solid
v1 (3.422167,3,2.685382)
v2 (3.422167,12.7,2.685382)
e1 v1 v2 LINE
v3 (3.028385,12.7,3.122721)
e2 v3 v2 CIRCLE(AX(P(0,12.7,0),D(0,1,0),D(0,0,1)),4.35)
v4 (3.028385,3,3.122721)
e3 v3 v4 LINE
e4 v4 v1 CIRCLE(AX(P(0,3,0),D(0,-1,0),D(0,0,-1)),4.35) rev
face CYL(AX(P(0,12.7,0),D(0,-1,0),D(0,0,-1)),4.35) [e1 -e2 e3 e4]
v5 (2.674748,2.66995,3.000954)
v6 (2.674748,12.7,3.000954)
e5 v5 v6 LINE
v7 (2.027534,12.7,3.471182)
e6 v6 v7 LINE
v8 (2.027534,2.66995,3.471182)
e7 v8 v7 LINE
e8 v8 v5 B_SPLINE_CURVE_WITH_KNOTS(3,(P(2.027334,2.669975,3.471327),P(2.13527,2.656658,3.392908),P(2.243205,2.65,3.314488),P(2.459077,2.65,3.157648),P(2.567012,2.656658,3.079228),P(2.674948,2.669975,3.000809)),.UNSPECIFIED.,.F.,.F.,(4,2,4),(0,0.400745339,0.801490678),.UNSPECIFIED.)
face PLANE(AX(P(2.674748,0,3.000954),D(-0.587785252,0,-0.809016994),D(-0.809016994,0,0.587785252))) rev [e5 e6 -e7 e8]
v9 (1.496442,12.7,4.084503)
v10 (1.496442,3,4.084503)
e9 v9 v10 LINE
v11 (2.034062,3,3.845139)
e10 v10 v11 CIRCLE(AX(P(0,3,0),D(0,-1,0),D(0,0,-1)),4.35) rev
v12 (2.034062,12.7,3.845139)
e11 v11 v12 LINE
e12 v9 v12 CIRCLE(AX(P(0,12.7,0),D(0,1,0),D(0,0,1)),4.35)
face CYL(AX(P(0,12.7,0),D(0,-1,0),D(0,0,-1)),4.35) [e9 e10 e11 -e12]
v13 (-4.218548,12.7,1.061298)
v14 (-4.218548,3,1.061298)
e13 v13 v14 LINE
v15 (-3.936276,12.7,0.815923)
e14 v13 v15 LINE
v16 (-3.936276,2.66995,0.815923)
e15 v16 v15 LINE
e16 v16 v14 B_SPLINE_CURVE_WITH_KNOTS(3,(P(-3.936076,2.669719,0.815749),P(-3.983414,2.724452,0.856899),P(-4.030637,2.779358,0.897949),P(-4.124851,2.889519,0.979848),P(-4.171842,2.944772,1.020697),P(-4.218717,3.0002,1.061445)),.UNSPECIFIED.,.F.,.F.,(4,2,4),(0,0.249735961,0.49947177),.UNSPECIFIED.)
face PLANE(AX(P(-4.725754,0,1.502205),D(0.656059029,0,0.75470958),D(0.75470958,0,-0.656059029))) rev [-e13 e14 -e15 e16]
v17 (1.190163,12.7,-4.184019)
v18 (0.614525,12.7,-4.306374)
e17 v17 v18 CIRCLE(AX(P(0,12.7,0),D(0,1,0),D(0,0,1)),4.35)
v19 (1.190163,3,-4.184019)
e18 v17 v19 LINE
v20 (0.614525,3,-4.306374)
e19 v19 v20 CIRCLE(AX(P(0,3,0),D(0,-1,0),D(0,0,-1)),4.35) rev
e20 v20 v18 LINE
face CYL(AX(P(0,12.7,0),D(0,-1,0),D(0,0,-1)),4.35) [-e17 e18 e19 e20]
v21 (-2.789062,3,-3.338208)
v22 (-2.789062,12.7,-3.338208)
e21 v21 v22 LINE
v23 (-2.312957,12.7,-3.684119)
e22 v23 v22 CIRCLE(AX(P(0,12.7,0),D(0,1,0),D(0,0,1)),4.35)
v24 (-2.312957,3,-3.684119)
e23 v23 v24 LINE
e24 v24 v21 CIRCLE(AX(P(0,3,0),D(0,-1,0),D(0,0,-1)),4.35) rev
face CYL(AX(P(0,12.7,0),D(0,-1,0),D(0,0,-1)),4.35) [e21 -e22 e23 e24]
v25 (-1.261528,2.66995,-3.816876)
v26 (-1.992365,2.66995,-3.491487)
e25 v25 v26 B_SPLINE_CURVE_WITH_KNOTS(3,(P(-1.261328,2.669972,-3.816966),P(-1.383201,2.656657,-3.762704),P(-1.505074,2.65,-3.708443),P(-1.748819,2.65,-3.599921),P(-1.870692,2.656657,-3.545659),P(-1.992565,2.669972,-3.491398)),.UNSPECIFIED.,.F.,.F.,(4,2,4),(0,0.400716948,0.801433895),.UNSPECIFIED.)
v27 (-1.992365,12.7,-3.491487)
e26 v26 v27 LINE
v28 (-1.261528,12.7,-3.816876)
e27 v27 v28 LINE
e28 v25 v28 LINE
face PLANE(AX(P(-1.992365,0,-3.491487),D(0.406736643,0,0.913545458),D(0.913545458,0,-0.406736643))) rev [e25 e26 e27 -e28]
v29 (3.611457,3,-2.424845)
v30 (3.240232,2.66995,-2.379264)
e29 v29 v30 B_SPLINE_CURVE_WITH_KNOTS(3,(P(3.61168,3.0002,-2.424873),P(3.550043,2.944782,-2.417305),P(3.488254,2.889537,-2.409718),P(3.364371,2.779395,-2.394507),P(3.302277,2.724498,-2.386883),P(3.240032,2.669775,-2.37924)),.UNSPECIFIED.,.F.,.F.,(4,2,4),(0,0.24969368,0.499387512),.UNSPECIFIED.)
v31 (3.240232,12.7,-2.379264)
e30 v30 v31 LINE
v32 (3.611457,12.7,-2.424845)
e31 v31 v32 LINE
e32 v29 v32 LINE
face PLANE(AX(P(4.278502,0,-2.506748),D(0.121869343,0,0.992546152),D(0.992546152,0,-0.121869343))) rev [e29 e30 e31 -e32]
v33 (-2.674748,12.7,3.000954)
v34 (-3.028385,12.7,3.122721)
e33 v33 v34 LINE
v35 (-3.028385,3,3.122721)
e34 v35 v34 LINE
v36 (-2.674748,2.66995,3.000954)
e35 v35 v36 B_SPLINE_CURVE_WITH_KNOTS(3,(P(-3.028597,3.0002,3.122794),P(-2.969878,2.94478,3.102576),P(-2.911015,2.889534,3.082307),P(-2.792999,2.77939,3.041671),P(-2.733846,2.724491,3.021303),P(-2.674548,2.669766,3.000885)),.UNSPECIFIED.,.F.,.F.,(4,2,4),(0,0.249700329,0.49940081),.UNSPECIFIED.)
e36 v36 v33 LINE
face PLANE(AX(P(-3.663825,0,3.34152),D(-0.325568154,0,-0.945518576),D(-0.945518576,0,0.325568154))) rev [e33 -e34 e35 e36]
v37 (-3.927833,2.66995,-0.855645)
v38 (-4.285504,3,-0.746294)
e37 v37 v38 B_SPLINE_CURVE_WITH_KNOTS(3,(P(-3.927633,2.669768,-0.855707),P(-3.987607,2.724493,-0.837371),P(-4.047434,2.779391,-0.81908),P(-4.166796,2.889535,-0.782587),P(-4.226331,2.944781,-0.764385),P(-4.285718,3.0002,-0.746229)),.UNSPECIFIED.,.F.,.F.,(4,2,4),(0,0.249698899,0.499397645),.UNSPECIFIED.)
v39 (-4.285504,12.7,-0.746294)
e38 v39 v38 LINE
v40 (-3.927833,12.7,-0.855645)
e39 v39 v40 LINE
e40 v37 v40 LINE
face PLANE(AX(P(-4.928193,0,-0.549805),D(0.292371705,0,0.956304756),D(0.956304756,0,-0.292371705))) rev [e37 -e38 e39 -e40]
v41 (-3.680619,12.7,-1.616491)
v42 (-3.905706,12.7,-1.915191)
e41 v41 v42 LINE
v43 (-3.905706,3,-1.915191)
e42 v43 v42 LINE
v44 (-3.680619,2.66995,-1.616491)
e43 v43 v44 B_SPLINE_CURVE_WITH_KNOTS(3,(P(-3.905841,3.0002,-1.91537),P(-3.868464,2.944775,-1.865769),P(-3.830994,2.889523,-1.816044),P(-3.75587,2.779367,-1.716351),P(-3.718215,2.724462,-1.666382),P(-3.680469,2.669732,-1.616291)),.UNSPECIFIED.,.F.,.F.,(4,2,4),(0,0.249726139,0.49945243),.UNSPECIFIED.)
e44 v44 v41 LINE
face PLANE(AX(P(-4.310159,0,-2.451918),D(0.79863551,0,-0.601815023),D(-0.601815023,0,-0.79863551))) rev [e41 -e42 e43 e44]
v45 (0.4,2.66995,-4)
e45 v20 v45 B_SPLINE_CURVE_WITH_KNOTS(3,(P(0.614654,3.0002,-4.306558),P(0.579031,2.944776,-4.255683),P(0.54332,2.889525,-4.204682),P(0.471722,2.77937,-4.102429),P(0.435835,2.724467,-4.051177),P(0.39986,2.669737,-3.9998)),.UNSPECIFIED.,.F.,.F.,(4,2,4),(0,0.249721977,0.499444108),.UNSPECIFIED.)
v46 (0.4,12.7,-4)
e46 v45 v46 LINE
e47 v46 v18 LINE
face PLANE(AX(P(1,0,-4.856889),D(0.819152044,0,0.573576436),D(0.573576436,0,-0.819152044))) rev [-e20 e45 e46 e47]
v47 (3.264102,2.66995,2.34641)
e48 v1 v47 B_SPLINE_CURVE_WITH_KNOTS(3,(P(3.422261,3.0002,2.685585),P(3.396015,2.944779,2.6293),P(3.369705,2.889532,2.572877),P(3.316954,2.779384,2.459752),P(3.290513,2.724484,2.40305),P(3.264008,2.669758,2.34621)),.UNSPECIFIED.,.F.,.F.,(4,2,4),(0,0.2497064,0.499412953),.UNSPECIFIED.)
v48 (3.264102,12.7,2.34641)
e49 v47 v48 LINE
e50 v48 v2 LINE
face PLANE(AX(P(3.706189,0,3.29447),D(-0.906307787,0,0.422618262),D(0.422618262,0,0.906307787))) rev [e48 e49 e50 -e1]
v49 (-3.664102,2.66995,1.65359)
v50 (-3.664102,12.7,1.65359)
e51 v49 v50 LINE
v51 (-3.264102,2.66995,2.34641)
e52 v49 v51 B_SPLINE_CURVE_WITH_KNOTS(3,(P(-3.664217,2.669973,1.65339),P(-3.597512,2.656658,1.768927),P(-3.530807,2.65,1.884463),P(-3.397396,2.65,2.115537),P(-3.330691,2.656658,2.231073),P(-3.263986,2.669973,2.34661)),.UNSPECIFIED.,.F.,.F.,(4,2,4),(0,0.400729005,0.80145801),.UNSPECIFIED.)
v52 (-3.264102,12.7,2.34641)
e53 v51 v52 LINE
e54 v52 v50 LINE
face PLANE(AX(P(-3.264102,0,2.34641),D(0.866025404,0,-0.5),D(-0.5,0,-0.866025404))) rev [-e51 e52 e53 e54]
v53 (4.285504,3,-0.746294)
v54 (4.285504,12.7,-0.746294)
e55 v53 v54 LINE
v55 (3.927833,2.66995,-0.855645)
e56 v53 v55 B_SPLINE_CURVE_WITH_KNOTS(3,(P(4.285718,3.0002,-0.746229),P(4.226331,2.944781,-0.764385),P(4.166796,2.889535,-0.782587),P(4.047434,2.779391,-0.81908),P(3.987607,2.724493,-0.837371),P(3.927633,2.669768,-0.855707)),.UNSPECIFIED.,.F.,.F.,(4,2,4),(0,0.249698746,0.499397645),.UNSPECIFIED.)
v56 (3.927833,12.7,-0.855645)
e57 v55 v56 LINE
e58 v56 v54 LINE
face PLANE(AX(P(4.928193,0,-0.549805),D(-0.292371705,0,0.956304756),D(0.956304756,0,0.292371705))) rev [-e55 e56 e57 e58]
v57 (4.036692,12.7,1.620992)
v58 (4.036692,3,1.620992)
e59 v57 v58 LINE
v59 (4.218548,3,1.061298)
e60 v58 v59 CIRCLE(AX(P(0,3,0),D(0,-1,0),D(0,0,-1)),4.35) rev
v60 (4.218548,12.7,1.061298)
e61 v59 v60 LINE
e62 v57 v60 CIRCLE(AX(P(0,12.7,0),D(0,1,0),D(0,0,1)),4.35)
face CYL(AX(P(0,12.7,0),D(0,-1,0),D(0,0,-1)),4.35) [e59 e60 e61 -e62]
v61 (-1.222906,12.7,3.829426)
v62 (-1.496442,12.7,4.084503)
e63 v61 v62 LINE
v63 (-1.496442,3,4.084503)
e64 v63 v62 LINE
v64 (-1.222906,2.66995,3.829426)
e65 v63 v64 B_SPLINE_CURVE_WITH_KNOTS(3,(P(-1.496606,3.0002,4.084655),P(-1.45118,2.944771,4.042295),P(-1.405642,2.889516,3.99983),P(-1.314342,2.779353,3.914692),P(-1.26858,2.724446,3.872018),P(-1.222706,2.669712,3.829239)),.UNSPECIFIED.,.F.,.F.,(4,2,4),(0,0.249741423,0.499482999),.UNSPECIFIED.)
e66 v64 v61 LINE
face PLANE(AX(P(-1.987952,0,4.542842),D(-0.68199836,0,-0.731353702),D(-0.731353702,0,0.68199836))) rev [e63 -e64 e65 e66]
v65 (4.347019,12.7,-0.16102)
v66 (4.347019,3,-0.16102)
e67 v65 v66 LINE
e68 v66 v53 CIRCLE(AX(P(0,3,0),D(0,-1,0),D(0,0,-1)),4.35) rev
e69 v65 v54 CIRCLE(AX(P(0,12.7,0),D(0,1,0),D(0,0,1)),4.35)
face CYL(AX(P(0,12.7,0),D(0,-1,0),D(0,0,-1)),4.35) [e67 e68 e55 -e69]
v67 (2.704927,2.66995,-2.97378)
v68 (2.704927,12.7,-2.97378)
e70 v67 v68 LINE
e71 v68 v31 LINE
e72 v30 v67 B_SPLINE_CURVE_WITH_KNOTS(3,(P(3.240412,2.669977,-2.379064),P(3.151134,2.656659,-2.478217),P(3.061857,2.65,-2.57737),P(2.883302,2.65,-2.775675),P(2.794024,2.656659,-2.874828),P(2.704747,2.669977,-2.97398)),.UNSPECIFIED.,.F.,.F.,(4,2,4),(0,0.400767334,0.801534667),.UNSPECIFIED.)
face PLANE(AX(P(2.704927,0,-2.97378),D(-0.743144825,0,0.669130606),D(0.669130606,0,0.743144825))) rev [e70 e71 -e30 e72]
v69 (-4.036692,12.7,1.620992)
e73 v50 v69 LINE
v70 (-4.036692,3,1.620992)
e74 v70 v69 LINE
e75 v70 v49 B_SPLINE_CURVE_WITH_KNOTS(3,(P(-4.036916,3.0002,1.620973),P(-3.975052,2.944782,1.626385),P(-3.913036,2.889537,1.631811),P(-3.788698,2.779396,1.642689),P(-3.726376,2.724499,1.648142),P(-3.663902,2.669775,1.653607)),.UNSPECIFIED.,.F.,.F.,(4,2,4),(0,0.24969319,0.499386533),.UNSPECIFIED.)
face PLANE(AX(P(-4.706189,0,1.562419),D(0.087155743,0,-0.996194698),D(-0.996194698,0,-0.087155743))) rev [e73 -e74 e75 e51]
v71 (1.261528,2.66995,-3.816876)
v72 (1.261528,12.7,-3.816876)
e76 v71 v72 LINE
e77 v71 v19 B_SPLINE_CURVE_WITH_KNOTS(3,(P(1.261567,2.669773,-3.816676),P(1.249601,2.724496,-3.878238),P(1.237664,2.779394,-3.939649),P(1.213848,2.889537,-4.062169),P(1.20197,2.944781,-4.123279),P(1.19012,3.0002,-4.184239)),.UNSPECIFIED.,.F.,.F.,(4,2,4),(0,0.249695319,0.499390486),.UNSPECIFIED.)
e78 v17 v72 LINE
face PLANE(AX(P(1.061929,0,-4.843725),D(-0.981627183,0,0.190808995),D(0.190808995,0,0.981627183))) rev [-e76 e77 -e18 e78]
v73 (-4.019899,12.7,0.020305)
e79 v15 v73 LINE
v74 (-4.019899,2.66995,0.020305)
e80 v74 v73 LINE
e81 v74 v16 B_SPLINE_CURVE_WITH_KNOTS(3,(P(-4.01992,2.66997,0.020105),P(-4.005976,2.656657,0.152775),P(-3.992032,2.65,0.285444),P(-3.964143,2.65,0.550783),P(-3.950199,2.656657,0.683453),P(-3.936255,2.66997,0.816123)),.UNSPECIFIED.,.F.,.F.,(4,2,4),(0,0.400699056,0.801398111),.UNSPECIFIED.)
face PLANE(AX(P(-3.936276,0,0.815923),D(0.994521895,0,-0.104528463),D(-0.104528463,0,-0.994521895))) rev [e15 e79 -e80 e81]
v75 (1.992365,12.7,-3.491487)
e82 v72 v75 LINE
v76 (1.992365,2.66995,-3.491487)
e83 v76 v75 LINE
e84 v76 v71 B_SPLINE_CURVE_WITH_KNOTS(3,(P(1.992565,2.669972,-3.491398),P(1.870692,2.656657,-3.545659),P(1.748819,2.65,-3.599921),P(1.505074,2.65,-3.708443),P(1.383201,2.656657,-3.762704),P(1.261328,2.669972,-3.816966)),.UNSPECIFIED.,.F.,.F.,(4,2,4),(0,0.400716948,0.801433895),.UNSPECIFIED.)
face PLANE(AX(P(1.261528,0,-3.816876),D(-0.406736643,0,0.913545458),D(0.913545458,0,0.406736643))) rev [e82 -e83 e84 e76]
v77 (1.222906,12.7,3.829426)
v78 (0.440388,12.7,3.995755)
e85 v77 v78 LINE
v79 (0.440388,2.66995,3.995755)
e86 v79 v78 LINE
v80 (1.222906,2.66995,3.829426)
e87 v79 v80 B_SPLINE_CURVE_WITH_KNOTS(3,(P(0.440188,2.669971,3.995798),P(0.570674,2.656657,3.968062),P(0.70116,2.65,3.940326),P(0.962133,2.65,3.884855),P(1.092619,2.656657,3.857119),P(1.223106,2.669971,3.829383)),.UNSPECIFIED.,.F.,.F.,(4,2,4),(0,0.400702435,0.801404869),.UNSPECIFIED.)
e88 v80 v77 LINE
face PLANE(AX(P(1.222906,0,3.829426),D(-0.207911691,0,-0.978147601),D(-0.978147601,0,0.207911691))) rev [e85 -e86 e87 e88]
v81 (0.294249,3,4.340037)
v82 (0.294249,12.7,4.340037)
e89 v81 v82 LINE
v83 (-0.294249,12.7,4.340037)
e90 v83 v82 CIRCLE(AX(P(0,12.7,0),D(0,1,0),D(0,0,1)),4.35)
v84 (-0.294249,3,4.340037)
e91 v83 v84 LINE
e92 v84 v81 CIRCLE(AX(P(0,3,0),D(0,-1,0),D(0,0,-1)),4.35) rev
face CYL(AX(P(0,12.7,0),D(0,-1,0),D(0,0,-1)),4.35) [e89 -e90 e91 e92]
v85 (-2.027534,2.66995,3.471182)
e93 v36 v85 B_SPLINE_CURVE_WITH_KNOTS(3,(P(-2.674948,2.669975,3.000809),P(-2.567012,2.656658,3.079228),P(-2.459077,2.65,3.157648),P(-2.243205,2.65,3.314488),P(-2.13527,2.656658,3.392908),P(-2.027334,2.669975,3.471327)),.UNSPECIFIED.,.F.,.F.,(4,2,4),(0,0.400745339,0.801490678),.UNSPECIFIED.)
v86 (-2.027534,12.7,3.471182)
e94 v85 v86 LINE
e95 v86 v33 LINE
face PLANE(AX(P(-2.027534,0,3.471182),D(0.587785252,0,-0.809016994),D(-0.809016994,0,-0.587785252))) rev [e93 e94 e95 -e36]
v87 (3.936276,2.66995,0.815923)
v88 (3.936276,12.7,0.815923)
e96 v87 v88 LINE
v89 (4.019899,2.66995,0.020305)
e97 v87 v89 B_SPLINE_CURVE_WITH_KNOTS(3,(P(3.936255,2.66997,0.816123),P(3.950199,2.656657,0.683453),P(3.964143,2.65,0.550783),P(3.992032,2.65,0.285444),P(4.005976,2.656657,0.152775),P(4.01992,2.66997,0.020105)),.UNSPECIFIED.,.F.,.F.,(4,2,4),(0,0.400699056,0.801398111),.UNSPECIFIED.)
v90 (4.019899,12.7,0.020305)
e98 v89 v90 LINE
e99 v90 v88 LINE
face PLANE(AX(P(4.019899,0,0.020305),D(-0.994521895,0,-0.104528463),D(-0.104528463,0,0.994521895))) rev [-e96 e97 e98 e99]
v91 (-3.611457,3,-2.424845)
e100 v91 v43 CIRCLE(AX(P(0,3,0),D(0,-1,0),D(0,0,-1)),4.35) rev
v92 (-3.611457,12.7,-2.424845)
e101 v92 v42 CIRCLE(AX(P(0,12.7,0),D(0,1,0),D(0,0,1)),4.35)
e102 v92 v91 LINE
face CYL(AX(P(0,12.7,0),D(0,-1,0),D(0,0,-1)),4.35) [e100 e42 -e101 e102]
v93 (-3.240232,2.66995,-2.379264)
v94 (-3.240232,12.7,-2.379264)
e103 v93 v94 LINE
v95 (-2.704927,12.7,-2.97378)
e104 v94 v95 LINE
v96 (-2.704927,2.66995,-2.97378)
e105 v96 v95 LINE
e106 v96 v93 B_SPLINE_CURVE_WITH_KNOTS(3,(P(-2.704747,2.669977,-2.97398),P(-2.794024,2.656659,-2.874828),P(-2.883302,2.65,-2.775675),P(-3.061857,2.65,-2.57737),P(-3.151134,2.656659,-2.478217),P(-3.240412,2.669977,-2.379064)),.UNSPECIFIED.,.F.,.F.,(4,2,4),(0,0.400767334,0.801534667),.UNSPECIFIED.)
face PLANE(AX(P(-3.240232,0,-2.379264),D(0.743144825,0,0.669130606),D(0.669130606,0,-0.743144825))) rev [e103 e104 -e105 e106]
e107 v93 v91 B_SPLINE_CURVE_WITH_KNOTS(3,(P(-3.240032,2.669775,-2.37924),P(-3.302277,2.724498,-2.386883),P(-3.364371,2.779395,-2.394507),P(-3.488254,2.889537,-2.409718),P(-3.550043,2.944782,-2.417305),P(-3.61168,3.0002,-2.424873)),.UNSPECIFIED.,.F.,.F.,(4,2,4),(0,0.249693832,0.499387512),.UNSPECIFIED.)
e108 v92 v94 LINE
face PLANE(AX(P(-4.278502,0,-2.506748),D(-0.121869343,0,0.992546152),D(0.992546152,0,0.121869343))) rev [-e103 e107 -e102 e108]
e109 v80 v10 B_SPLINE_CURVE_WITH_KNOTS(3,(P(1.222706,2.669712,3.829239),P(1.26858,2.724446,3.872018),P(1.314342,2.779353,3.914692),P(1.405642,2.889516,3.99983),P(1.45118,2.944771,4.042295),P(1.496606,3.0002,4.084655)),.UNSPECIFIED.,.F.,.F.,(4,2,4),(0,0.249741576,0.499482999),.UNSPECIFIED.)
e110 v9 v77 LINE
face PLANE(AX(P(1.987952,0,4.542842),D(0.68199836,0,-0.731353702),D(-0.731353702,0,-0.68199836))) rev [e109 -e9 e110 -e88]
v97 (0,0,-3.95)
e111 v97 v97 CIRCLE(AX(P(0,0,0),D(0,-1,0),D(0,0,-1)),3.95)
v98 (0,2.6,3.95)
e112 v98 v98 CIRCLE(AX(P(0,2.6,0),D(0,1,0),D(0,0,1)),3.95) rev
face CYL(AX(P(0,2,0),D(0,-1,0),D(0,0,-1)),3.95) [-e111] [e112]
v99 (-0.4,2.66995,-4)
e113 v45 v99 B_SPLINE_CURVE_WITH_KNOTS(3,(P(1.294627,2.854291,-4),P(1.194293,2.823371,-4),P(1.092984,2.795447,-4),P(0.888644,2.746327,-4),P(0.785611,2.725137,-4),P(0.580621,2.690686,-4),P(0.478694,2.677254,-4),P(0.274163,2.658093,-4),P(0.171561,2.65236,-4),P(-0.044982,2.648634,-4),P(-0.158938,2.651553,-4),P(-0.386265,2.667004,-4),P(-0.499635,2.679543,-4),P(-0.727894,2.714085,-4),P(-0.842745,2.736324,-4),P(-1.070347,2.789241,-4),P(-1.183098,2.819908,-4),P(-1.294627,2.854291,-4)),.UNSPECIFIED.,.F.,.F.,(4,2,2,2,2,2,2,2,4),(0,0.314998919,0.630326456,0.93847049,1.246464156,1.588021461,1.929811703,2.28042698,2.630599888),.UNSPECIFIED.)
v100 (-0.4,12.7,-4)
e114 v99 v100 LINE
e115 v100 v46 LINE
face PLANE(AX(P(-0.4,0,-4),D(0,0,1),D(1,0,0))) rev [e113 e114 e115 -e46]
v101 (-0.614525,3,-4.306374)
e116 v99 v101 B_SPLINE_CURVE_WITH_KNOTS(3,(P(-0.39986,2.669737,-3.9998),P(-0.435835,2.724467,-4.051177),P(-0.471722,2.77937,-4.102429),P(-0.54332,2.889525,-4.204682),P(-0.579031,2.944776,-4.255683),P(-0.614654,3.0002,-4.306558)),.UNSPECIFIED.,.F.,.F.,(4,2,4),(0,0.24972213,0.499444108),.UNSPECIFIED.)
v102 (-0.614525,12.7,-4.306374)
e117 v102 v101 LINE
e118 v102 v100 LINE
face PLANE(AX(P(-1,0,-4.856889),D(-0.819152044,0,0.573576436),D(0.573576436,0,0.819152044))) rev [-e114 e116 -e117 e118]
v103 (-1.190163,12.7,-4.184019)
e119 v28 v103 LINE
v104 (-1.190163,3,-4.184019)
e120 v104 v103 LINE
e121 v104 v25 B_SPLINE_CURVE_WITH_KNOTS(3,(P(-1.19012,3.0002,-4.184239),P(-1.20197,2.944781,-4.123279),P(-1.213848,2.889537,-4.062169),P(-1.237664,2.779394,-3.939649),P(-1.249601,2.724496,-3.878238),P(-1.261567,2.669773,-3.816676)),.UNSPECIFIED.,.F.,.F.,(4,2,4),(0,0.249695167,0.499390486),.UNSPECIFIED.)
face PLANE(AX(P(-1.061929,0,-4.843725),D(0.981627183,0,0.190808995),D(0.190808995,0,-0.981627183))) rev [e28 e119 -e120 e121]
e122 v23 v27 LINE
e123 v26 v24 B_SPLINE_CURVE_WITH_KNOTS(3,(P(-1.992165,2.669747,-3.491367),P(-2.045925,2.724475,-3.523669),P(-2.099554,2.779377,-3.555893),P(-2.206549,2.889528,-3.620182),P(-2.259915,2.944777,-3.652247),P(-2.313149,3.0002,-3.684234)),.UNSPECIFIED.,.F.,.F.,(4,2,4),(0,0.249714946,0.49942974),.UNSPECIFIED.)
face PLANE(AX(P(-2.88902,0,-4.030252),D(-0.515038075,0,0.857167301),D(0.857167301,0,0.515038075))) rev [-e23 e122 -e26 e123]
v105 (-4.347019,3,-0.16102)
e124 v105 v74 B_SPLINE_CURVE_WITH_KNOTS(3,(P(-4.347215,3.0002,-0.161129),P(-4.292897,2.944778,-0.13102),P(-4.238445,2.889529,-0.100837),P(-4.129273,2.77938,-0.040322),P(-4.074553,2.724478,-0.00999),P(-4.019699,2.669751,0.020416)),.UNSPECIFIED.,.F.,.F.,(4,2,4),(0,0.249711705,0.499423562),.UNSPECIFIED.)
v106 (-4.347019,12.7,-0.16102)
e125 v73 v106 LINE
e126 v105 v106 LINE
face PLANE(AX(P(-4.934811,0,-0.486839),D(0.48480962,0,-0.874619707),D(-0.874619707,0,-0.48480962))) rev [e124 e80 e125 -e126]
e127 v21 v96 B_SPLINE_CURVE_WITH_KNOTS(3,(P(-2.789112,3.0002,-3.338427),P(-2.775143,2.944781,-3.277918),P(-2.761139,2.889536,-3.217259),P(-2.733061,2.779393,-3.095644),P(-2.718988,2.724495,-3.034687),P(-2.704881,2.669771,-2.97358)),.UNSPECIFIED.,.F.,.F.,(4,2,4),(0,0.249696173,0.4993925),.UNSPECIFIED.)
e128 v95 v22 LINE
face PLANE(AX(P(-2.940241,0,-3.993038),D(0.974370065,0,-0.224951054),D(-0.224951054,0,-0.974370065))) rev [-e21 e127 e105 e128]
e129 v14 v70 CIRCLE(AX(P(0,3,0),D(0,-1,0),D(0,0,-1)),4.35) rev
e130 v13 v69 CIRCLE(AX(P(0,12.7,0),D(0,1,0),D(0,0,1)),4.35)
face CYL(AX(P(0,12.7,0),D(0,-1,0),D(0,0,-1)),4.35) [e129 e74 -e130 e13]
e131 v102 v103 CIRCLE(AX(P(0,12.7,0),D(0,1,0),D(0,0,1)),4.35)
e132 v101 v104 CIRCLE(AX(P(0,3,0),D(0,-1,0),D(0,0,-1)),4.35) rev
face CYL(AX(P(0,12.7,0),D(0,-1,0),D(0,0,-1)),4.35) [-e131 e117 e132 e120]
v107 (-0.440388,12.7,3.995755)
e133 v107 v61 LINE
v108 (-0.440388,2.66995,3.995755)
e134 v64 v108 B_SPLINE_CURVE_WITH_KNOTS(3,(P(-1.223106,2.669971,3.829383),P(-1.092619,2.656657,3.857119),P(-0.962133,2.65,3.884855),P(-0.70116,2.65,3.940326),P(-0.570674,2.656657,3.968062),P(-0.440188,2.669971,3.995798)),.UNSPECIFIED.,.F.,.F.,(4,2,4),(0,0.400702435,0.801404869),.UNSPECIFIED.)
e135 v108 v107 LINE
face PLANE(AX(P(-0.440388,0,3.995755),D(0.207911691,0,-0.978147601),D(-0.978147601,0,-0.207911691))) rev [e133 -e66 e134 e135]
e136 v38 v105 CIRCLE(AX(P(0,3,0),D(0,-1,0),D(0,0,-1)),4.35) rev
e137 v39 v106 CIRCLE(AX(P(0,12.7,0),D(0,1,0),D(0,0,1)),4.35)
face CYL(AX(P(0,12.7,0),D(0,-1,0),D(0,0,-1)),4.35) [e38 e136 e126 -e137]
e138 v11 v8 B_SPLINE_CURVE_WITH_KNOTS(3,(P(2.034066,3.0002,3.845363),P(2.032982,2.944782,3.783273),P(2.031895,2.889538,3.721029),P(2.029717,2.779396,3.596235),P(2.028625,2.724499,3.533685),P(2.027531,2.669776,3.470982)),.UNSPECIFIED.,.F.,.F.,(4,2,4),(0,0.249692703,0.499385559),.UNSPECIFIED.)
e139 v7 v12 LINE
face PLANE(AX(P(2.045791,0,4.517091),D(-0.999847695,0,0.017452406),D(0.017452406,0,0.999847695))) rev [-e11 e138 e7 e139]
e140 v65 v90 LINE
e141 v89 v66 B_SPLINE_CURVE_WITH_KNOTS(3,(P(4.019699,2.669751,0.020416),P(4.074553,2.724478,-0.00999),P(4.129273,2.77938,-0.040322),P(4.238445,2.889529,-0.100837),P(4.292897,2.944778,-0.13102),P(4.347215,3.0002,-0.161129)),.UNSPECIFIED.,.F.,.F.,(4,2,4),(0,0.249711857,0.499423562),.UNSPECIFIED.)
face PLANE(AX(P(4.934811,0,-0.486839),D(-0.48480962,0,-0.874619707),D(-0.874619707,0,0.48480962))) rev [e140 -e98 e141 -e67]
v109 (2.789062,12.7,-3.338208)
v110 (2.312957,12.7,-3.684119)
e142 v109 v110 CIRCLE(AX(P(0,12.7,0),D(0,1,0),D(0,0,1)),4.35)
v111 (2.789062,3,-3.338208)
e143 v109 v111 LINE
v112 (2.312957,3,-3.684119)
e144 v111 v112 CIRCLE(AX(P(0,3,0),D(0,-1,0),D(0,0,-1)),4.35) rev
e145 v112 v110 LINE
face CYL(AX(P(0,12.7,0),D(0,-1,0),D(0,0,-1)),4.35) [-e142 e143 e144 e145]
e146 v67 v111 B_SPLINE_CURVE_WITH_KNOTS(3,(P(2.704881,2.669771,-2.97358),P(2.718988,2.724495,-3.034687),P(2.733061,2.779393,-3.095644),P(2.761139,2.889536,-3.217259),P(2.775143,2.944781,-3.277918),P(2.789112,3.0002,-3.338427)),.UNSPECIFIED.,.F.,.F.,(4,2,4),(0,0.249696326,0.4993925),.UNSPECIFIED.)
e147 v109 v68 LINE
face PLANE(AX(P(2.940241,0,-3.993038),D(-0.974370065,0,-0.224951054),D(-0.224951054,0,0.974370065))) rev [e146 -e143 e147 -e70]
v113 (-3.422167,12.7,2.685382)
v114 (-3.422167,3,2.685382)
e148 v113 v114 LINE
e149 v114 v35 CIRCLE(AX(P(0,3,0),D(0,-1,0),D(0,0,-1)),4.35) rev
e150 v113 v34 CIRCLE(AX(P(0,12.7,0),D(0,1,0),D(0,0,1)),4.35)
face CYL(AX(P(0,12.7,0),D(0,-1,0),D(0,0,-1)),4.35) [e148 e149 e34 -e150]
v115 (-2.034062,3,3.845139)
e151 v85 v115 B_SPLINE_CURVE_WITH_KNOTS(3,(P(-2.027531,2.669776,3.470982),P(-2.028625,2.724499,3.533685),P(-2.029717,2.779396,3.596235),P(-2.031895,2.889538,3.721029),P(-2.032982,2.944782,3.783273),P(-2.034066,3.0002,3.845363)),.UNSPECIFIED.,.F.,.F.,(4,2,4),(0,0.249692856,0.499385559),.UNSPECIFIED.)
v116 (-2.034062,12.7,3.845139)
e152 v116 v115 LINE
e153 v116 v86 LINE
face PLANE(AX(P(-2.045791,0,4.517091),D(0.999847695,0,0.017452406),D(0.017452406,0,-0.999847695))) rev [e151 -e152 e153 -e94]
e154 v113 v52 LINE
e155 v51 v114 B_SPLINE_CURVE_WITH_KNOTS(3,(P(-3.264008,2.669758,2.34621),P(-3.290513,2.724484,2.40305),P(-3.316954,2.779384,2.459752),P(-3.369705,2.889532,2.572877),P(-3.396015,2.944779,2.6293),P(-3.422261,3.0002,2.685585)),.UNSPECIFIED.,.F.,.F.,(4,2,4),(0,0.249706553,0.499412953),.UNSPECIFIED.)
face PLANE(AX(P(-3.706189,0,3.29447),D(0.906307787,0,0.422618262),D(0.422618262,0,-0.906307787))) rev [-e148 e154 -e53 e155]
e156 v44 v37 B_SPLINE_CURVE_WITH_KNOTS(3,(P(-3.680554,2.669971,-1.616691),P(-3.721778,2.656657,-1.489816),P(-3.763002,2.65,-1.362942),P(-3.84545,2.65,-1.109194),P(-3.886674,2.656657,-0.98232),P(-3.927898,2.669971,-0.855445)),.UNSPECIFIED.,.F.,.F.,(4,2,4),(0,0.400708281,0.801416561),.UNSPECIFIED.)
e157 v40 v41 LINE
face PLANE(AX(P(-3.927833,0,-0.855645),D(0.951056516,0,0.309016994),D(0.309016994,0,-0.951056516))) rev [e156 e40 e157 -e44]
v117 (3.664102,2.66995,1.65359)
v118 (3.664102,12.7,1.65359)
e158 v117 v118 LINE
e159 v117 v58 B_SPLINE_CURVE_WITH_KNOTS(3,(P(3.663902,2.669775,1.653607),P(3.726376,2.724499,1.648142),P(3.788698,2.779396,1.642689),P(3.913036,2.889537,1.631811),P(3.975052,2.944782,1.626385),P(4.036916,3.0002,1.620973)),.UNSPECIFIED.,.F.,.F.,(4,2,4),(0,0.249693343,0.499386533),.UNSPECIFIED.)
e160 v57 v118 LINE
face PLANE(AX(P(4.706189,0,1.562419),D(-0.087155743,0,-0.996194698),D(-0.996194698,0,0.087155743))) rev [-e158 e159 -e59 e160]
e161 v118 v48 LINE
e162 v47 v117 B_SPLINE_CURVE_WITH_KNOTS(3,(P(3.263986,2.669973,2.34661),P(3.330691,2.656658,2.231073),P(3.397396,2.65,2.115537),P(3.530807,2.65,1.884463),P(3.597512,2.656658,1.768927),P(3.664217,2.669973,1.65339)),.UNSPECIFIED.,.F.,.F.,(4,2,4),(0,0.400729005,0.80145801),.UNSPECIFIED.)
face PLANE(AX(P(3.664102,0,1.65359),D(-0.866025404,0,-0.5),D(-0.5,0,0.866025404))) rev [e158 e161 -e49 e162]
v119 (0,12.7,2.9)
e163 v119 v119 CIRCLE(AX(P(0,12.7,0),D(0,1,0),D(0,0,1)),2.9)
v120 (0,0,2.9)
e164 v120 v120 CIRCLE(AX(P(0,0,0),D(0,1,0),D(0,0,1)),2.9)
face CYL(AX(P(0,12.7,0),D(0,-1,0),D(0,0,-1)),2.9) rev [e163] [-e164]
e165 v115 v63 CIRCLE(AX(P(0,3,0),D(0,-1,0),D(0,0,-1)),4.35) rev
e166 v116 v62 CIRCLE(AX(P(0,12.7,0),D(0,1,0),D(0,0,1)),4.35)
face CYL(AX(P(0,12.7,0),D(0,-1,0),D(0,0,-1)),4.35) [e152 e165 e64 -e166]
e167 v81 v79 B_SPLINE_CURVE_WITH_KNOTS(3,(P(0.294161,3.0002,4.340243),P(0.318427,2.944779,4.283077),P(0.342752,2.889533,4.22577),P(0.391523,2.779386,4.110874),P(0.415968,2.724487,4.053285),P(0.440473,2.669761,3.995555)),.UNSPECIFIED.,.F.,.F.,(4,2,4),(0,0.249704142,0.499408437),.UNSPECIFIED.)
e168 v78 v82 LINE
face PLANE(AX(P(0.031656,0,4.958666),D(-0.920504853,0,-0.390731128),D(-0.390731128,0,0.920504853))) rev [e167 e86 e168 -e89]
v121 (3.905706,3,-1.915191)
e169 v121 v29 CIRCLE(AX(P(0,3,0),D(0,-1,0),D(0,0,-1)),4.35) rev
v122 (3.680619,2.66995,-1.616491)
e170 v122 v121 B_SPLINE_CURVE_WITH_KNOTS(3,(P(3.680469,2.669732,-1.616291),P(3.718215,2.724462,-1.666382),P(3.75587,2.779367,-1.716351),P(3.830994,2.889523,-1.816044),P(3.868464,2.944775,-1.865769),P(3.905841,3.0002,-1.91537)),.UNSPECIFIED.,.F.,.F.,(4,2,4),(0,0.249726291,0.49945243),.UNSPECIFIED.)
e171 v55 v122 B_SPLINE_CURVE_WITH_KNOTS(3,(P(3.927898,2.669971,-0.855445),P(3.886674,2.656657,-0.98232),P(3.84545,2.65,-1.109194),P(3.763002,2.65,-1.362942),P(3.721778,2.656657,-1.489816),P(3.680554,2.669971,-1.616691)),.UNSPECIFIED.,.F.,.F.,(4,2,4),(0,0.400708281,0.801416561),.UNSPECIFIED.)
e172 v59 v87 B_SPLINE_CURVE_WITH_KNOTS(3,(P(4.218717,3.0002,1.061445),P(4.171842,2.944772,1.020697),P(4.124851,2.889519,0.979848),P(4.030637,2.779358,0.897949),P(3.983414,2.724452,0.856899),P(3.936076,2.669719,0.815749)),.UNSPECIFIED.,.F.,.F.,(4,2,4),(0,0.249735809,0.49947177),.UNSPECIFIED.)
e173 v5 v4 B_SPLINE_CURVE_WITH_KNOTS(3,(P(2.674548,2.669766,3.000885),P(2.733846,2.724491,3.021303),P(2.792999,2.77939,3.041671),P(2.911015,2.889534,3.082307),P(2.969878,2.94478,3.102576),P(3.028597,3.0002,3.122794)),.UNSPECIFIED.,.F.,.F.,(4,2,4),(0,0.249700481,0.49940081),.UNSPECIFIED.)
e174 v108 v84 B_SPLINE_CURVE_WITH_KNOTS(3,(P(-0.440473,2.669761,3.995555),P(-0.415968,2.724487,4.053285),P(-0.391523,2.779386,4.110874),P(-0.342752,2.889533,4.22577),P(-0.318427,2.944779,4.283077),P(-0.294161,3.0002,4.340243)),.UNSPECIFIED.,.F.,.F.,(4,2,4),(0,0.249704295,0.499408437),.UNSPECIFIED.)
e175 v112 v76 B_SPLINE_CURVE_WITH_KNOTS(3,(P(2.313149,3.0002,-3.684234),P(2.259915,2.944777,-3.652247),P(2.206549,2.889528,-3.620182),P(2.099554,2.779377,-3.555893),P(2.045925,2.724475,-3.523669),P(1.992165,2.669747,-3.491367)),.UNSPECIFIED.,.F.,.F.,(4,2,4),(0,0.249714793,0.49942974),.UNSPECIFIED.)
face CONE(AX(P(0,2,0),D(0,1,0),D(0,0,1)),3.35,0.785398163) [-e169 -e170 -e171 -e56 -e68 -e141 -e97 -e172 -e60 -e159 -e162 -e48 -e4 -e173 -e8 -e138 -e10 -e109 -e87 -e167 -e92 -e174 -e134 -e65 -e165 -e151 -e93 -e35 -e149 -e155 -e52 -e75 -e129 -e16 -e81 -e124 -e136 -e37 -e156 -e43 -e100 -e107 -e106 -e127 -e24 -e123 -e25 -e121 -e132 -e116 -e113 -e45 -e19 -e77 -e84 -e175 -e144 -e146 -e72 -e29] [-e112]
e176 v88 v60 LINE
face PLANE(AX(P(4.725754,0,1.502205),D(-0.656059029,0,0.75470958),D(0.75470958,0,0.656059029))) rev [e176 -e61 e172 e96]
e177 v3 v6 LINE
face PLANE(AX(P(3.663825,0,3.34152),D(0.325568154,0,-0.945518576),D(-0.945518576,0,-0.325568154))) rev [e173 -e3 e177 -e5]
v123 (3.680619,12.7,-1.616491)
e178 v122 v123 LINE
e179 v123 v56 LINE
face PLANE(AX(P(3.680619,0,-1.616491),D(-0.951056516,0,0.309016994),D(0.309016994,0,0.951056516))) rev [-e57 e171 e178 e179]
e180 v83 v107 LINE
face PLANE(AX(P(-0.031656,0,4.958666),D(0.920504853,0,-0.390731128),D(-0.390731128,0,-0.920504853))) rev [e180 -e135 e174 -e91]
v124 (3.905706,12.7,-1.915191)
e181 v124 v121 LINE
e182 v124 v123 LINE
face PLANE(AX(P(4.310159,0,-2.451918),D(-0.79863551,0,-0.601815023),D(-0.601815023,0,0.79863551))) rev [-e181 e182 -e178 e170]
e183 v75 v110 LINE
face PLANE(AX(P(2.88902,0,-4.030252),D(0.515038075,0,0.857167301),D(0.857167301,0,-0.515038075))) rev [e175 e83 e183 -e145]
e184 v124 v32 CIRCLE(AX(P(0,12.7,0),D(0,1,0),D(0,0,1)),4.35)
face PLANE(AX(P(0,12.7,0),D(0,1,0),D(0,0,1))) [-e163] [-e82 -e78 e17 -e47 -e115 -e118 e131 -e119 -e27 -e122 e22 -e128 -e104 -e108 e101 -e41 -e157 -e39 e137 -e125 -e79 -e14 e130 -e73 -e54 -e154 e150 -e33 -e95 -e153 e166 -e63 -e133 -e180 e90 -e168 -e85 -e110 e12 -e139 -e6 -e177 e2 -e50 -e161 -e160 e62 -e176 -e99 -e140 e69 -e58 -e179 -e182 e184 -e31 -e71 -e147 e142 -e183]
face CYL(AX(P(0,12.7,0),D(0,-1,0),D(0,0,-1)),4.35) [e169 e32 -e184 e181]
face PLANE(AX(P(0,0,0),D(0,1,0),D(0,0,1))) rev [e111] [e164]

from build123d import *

# Parameters (mm, degrees)
ESQUISSE1_R             = 4.35
ESQUISSE1_R_2           = 2.9
BOSS_EXTRU_1_DEPTH      = 12.7
ESQUISSE2_OUTSIDE_W     = 14.236
ESQUISSE2_OUTSIDE_H     = 14.236
ESQUISSE2_OUTSIDE_R     = 3.95
ENL_V_MAT_EXTRU_1_DEPTH = 2
CHANFREIN1_SIZE         = 1
ENL_V_MAT_EXTRU_2_DEPTH = 15.111520117


with BuildPart() as part:
    # Esquisse1 → Boss.-Extru.1 (new body)
    with BuildSketch(Plane(origin=(0, 0, 0), x_dir=(1, 0, 0), z_dir=(0, 1, 0))):
        with Locations(Location((0, 0, 0), (0, 0, 270))):
            Circle(ESQUISSE1_R)
        with Locations(Location((0, 0, 0), (0, 0, 270))):
            Circle(ESQUISSE1_R_2, mode=Mode.SUBTRACT)
    extrude(amount=BOSS_EXTRU_1_DEPTH)

    # Esquisse2 outside → Enlèv. mat.-Extru.1 (cut)
    with BuildSketch(Plane.XZ):
        Rectangle(ESQUISSE2_OUTSIDE_W, ESQUISSE2_OUTSIDE_H)
        with Locations(Location((0, 0, 0), (0, 0, 270))):
            Circle(ESQUISSE2_OUTSIDE_R, mode=Mode.SUBTRACT)
    extrude(amount=-ENL_V_MAT_EXTRU_1_DEPTH, mode=Mode.SUBTRACT)

    # Chanfrein1
    # the kernel refuses this chamfer: 1 mm, written as the material it takes off along each edge
    with BuildSketch(Plane(origin=(0, 2, 0), x_dir=(0, 0, 1), z_dir=(1, 0, 0))) as chanfrein1_piece_1_section:
        Polygon((4.35, -CHANFREIN1_SIZE), (4.35 - CHANFREIN1_SIZE, 0), (4.35, 0), align=None)
    chanfrein1_piece_1 = revolve(axis=Axis((0, 2, 0), (0, -1, 0)), mode=Mode.PRIVATE)
    chanfrein1_piece_1 = chanfrein1_piece_1 - Plane(origin=(0, 2.799298708, 0), x_dir=(0, 0, -1), z_dir=(0, -1, 0)) * Cylinder(3.95, 18, mode=Mode.PRIVATE)
    add(chanfrein1_piece_1, mode=Mode.SUBTRACT)

    # Esquisse3 → Enlèv. mat.-Extru.2 (cut, through all)
    with BuildSketch(Plane(origin=(0, 12.7, 0), x_dir=(1, 0, 0), z_dir=(0, 1, 0))):
        Polygon((1, 4.856888804), (-1, 4.856888804), (-0.4, 4), (0.4, 4), align=None)
        Polygon((2.889020106, 4.030252062), (1.06192919, 4.843725348), (1.261528389, 3.816876488), (1.992364755, 3.491487173), align=None)
        Polygon((4.278502389, 2.506748125), (2.940241176, 3.993037776), (2.704927059, 2.973780356), (3.240231544, 2.379264495), align=None)
        Polygon((4.92819274, 0.549804664), (4.310158752, 2.451917697), (3.680619267, 1.616490584), (3.927832863, 0.855645371), align=None)
        Polygon((4.725753796, -1.502205018), (4.934810722, 0.486838772), (4.019898967, -0.020305095), (3.936276196, -0.815922611), align=None)
        Polygon((3.706189088, -3.294469806), (4.706189088, -1.562418998), (3.664101615, -1.653589838), (3.264101615, -2.346410162), align=None)
        Polygon((2.045790617, -4.517090835), (3.663824605, -3.34152033), (2.674747807, -3.000953877), (2.027534211, -3.471182078), align=None)
        Polygon((0.031656363, -4.958665822), (1.987951564, -4.54284244), (1.222905804, -3.829425727), (0.440387723, -3.995755079), align=None)
        Polygon((-1.987951564, -4.54284244), (-0.031656363, -4.958665822), (-0.440387723, -3.995755079), (-1.222905804, -3.829425727), align=None)
        Polygon((-3.663824605, -3.34152033), (-2.045790617, -4.517090835), (-2.027534211, -3.471182078), (-2.674747807, -3.000953877), align=None)
        Polygon((-4.706189088, -1.562418998), (-3.706189088, -3.294469806), (-3.264101615, -2.346410162), (-3.664101615, -1.653589838), align=None)
        Polygon((-4.934810722, 0.486838772), (-4.725753796, -1.502205018), (-3.936276196, -0.815922611), (-4.019898967, -0.020305095), align=None)
        Polygon((-4.310158752, 2.451917697), (-4.92819274, 0.549804664), (-3.927832863, 0.855645371), (-3.680619267, 1.616490584), align=None)
        Polygon((-2.940241176, 3.993037776), (-4.278502389, 2.506748125), (-3.240231544, 2.379264495), (-2.704927059, 2.973780356), align=None)
        Polygon((-1.06192919, 4.843725348), (-2.889020106, 4.030252062), (-1.992364755, 3.491487173), (-1.261528389, 3.816876488), align=None)
    extrude(amount=-ENL_V_MAT_EXTRU_2_DEPTH, mode=Mode.SUBTRACT)


solid = part.part
